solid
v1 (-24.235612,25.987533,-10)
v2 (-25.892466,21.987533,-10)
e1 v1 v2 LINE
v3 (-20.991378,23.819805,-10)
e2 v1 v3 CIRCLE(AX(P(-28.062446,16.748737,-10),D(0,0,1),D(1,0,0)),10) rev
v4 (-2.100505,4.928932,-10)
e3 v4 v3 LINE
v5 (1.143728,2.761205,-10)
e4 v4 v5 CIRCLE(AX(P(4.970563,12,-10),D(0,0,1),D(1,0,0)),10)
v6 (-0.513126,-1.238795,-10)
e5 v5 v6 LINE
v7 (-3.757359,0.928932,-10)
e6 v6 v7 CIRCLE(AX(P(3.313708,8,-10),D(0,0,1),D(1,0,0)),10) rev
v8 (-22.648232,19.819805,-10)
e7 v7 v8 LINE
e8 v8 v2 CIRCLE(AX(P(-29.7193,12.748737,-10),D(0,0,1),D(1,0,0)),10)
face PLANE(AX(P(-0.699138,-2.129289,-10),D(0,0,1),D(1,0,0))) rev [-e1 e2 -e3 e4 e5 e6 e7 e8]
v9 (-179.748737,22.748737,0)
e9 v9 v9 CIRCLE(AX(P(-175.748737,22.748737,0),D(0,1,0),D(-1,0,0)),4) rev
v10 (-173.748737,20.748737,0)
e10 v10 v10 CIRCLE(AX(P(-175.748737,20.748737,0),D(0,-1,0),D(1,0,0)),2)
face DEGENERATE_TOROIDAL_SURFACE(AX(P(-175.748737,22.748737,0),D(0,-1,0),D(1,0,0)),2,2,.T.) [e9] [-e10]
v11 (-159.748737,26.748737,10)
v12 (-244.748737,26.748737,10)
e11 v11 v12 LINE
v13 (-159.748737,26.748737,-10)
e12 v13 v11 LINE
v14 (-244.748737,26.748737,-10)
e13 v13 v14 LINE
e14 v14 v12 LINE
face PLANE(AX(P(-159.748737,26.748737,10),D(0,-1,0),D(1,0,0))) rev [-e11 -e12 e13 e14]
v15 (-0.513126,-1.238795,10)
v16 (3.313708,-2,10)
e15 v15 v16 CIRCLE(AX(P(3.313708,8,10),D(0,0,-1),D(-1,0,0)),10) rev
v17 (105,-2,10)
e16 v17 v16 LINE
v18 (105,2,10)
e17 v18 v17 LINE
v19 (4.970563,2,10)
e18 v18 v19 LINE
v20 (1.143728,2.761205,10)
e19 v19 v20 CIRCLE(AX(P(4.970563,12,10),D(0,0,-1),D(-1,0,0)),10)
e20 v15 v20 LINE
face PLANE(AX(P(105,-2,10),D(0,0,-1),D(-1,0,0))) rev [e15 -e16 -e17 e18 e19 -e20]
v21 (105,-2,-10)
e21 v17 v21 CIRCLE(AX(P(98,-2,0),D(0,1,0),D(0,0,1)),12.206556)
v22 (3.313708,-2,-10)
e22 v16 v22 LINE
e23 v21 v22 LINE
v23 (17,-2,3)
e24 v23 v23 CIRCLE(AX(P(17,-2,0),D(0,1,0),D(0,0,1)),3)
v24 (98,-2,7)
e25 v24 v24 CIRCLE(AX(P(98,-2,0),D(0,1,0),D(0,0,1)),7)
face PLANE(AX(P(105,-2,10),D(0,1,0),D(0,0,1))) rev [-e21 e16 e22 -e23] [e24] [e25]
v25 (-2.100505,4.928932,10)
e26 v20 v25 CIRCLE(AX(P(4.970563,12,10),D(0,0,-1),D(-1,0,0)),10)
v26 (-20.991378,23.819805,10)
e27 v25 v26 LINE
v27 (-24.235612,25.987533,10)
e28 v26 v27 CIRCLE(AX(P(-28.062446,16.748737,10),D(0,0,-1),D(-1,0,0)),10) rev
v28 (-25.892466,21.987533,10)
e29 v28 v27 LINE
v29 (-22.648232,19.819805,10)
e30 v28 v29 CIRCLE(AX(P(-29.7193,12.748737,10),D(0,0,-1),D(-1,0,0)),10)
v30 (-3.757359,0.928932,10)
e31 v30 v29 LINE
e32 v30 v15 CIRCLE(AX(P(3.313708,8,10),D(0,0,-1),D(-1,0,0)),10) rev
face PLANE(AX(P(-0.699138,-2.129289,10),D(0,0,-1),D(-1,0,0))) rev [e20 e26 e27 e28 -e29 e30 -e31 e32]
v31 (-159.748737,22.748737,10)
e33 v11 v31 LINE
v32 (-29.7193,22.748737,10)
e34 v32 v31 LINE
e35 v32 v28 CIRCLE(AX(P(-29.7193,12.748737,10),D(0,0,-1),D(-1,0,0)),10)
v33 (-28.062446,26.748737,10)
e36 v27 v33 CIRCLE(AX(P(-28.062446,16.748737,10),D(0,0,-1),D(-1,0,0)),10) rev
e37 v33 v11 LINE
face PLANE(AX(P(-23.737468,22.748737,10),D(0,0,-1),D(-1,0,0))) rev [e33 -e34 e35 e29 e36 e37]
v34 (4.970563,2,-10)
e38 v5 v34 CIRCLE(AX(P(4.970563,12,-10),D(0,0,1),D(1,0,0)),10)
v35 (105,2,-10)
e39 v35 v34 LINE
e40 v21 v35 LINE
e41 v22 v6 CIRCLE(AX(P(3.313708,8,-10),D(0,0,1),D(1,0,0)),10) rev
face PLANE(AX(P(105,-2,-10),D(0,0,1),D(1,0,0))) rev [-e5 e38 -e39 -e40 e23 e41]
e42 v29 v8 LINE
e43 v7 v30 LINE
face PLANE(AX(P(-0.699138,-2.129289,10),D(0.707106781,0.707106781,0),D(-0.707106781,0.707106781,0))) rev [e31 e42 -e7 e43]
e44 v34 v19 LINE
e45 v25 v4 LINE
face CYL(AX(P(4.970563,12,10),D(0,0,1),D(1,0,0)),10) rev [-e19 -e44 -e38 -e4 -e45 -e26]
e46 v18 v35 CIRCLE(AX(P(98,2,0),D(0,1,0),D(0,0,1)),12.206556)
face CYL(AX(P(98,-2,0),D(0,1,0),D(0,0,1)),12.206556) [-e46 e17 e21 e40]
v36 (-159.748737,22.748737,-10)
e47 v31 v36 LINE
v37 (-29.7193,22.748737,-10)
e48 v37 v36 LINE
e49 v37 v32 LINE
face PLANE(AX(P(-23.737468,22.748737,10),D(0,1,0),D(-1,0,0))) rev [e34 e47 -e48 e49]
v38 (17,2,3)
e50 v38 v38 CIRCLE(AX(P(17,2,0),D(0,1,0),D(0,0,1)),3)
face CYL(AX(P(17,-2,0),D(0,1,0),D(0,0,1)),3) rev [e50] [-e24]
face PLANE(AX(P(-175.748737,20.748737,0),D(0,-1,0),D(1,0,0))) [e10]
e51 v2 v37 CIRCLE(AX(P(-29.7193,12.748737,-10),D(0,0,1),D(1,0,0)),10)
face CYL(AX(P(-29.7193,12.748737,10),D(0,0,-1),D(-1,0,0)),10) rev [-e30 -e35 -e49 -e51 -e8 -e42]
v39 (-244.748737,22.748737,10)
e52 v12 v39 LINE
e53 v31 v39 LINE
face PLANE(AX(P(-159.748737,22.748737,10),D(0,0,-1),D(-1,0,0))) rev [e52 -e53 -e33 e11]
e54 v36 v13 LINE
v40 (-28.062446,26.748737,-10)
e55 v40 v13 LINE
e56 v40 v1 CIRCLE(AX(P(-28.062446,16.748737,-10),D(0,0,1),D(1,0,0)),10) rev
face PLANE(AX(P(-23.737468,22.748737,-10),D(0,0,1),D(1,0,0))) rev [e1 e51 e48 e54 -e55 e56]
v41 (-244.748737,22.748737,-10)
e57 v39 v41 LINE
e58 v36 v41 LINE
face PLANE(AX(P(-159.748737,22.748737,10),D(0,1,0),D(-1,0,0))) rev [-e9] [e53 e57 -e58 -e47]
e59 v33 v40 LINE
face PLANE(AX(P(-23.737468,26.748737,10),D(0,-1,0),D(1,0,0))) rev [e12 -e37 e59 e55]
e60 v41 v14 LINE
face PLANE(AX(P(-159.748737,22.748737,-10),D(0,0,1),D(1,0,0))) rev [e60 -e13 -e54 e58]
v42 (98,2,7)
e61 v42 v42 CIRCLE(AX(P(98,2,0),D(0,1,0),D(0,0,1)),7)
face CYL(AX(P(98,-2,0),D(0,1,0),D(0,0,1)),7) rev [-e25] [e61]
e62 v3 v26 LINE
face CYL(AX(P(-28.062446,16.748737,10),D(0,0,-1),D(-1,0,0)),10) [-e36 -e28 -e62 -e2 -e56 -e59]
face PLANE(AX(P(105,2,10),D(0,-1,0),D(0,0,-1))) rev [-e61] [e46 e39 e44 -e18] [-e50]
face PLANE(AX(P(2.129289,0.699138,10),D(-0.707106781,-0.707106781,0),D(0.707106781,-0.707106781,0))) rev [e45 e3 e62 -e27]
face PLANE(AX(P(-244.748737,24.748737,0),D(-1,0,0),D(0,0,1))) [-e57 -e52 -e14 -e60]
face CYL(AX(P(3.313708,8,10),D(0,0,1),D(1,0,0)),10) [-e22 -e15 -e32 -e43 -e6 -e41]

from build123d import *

# Parameters (mm, degrees)
SKETCH3_W           = 20
SKETCH3_H           = 4
FILLET1_R           = 10
BOSS_EXTRUDE1_DEPTH = 4
SKETCH4_4_R         = 7
SKETCH4_4_R_2       = 3
CUT_EXTRUDE6_DEPTH  = 4
SKETCH5_R           = 4
BOSS_EXTRUDE2_DEPTH = 2
FILLET4_R           = 2


with BuildPart() as part:
    # Sweep1: sweep along a path in Sketch2
    with BuildLine(Plane.XY) as sweep1_path:
        Line((105, 0), (0, 0))
        Line((0, 0), (-24.748737342, 24.748737342))
        Line((-24.748737342, 24.748737342), (-159.748737342, 24.748737342))
        Line((-159.748737342, 24.748737342), (-244.748737342, 24.748737342))
    # Sketch3 → Sweep1 (sweep)
    with BuildSketch(Plane(origin=(105, 0, 0), x_dir=(0, 0, -1), z_dir=(1, 0, 0))):
        Rectangle(SKETCH3_W, SKETCH3_H)
    sweep(path=sweep1_path.line, transition=Transition.RIGHT)

    # Fillet1
    fillet1_edges = [part.edges().sort_by_distance(p)[0] for p in [
        (-0.828427125, -2, 0),
        (0.828427125, 2, 0),
        (-23.920310217, 26.748737342, 0),
        (-25.577164466, 22.748737342, 0),
    ]]
    fillet(fillet1_edges, radius=FILLET1_R)

    # Sketch4 → Boss-Extrude1 (add)
    with BuildSketch(Plane(origin=(0, 2, 0), x_dir=(1, 0, 0), z_dir=(0, 1, 0))):
        with BuildLine():
            ThreePointArc((105, -10), (110.206555616, 0), (105, 10))
            Line((105, 10), (105, 0))
            Line((105, 0), (105, -10))
        make_face()
    extrude(amount=-BOSS_EXTRUDE1_DEPTH)

    # Sketch4<4> → Cut-Extrude6 (cut)
    with BuildSketch(Plane(origin=(0, 2, 0), x_dir=(1, 0, 0), z_dir=(0, 1, 0))):
        with Locations(Location((98, 0, 0), (0, 0, 270))):
            Circle(SKETCH4_4_R)
        with Locations(Location((17, 0, 0), (0, 0, 270))):
            Circle(SKETCH4_4_R_2)
    extrude(amount=-CUT_EXTRUDE6_DEPTH, mode=Mode.SUBTRACT)

    # Sketch5 → Boss-Extrude2 (add)
    with BuildSketch(Plane.XZ.offset(-22.748737342)):
        with Locations(Location((-175.748737342, 0, 0), (0, 0, 180))):
            Circle(SKETCH5_R)
    extrude(amount=BOSS_EXTRUDE2_DEPTH)

    # Fillet4
    fillet4_edges = [part.edges().sort_by_distance(p)[0] for p in [
        (-171.748737342, 20.748737342, 0),
    ]]
    fillet(fillet4_edges, radius=FILLET4_R - 0.0001)  # a hair under: the kernel refuses the full size


solid = part.part
